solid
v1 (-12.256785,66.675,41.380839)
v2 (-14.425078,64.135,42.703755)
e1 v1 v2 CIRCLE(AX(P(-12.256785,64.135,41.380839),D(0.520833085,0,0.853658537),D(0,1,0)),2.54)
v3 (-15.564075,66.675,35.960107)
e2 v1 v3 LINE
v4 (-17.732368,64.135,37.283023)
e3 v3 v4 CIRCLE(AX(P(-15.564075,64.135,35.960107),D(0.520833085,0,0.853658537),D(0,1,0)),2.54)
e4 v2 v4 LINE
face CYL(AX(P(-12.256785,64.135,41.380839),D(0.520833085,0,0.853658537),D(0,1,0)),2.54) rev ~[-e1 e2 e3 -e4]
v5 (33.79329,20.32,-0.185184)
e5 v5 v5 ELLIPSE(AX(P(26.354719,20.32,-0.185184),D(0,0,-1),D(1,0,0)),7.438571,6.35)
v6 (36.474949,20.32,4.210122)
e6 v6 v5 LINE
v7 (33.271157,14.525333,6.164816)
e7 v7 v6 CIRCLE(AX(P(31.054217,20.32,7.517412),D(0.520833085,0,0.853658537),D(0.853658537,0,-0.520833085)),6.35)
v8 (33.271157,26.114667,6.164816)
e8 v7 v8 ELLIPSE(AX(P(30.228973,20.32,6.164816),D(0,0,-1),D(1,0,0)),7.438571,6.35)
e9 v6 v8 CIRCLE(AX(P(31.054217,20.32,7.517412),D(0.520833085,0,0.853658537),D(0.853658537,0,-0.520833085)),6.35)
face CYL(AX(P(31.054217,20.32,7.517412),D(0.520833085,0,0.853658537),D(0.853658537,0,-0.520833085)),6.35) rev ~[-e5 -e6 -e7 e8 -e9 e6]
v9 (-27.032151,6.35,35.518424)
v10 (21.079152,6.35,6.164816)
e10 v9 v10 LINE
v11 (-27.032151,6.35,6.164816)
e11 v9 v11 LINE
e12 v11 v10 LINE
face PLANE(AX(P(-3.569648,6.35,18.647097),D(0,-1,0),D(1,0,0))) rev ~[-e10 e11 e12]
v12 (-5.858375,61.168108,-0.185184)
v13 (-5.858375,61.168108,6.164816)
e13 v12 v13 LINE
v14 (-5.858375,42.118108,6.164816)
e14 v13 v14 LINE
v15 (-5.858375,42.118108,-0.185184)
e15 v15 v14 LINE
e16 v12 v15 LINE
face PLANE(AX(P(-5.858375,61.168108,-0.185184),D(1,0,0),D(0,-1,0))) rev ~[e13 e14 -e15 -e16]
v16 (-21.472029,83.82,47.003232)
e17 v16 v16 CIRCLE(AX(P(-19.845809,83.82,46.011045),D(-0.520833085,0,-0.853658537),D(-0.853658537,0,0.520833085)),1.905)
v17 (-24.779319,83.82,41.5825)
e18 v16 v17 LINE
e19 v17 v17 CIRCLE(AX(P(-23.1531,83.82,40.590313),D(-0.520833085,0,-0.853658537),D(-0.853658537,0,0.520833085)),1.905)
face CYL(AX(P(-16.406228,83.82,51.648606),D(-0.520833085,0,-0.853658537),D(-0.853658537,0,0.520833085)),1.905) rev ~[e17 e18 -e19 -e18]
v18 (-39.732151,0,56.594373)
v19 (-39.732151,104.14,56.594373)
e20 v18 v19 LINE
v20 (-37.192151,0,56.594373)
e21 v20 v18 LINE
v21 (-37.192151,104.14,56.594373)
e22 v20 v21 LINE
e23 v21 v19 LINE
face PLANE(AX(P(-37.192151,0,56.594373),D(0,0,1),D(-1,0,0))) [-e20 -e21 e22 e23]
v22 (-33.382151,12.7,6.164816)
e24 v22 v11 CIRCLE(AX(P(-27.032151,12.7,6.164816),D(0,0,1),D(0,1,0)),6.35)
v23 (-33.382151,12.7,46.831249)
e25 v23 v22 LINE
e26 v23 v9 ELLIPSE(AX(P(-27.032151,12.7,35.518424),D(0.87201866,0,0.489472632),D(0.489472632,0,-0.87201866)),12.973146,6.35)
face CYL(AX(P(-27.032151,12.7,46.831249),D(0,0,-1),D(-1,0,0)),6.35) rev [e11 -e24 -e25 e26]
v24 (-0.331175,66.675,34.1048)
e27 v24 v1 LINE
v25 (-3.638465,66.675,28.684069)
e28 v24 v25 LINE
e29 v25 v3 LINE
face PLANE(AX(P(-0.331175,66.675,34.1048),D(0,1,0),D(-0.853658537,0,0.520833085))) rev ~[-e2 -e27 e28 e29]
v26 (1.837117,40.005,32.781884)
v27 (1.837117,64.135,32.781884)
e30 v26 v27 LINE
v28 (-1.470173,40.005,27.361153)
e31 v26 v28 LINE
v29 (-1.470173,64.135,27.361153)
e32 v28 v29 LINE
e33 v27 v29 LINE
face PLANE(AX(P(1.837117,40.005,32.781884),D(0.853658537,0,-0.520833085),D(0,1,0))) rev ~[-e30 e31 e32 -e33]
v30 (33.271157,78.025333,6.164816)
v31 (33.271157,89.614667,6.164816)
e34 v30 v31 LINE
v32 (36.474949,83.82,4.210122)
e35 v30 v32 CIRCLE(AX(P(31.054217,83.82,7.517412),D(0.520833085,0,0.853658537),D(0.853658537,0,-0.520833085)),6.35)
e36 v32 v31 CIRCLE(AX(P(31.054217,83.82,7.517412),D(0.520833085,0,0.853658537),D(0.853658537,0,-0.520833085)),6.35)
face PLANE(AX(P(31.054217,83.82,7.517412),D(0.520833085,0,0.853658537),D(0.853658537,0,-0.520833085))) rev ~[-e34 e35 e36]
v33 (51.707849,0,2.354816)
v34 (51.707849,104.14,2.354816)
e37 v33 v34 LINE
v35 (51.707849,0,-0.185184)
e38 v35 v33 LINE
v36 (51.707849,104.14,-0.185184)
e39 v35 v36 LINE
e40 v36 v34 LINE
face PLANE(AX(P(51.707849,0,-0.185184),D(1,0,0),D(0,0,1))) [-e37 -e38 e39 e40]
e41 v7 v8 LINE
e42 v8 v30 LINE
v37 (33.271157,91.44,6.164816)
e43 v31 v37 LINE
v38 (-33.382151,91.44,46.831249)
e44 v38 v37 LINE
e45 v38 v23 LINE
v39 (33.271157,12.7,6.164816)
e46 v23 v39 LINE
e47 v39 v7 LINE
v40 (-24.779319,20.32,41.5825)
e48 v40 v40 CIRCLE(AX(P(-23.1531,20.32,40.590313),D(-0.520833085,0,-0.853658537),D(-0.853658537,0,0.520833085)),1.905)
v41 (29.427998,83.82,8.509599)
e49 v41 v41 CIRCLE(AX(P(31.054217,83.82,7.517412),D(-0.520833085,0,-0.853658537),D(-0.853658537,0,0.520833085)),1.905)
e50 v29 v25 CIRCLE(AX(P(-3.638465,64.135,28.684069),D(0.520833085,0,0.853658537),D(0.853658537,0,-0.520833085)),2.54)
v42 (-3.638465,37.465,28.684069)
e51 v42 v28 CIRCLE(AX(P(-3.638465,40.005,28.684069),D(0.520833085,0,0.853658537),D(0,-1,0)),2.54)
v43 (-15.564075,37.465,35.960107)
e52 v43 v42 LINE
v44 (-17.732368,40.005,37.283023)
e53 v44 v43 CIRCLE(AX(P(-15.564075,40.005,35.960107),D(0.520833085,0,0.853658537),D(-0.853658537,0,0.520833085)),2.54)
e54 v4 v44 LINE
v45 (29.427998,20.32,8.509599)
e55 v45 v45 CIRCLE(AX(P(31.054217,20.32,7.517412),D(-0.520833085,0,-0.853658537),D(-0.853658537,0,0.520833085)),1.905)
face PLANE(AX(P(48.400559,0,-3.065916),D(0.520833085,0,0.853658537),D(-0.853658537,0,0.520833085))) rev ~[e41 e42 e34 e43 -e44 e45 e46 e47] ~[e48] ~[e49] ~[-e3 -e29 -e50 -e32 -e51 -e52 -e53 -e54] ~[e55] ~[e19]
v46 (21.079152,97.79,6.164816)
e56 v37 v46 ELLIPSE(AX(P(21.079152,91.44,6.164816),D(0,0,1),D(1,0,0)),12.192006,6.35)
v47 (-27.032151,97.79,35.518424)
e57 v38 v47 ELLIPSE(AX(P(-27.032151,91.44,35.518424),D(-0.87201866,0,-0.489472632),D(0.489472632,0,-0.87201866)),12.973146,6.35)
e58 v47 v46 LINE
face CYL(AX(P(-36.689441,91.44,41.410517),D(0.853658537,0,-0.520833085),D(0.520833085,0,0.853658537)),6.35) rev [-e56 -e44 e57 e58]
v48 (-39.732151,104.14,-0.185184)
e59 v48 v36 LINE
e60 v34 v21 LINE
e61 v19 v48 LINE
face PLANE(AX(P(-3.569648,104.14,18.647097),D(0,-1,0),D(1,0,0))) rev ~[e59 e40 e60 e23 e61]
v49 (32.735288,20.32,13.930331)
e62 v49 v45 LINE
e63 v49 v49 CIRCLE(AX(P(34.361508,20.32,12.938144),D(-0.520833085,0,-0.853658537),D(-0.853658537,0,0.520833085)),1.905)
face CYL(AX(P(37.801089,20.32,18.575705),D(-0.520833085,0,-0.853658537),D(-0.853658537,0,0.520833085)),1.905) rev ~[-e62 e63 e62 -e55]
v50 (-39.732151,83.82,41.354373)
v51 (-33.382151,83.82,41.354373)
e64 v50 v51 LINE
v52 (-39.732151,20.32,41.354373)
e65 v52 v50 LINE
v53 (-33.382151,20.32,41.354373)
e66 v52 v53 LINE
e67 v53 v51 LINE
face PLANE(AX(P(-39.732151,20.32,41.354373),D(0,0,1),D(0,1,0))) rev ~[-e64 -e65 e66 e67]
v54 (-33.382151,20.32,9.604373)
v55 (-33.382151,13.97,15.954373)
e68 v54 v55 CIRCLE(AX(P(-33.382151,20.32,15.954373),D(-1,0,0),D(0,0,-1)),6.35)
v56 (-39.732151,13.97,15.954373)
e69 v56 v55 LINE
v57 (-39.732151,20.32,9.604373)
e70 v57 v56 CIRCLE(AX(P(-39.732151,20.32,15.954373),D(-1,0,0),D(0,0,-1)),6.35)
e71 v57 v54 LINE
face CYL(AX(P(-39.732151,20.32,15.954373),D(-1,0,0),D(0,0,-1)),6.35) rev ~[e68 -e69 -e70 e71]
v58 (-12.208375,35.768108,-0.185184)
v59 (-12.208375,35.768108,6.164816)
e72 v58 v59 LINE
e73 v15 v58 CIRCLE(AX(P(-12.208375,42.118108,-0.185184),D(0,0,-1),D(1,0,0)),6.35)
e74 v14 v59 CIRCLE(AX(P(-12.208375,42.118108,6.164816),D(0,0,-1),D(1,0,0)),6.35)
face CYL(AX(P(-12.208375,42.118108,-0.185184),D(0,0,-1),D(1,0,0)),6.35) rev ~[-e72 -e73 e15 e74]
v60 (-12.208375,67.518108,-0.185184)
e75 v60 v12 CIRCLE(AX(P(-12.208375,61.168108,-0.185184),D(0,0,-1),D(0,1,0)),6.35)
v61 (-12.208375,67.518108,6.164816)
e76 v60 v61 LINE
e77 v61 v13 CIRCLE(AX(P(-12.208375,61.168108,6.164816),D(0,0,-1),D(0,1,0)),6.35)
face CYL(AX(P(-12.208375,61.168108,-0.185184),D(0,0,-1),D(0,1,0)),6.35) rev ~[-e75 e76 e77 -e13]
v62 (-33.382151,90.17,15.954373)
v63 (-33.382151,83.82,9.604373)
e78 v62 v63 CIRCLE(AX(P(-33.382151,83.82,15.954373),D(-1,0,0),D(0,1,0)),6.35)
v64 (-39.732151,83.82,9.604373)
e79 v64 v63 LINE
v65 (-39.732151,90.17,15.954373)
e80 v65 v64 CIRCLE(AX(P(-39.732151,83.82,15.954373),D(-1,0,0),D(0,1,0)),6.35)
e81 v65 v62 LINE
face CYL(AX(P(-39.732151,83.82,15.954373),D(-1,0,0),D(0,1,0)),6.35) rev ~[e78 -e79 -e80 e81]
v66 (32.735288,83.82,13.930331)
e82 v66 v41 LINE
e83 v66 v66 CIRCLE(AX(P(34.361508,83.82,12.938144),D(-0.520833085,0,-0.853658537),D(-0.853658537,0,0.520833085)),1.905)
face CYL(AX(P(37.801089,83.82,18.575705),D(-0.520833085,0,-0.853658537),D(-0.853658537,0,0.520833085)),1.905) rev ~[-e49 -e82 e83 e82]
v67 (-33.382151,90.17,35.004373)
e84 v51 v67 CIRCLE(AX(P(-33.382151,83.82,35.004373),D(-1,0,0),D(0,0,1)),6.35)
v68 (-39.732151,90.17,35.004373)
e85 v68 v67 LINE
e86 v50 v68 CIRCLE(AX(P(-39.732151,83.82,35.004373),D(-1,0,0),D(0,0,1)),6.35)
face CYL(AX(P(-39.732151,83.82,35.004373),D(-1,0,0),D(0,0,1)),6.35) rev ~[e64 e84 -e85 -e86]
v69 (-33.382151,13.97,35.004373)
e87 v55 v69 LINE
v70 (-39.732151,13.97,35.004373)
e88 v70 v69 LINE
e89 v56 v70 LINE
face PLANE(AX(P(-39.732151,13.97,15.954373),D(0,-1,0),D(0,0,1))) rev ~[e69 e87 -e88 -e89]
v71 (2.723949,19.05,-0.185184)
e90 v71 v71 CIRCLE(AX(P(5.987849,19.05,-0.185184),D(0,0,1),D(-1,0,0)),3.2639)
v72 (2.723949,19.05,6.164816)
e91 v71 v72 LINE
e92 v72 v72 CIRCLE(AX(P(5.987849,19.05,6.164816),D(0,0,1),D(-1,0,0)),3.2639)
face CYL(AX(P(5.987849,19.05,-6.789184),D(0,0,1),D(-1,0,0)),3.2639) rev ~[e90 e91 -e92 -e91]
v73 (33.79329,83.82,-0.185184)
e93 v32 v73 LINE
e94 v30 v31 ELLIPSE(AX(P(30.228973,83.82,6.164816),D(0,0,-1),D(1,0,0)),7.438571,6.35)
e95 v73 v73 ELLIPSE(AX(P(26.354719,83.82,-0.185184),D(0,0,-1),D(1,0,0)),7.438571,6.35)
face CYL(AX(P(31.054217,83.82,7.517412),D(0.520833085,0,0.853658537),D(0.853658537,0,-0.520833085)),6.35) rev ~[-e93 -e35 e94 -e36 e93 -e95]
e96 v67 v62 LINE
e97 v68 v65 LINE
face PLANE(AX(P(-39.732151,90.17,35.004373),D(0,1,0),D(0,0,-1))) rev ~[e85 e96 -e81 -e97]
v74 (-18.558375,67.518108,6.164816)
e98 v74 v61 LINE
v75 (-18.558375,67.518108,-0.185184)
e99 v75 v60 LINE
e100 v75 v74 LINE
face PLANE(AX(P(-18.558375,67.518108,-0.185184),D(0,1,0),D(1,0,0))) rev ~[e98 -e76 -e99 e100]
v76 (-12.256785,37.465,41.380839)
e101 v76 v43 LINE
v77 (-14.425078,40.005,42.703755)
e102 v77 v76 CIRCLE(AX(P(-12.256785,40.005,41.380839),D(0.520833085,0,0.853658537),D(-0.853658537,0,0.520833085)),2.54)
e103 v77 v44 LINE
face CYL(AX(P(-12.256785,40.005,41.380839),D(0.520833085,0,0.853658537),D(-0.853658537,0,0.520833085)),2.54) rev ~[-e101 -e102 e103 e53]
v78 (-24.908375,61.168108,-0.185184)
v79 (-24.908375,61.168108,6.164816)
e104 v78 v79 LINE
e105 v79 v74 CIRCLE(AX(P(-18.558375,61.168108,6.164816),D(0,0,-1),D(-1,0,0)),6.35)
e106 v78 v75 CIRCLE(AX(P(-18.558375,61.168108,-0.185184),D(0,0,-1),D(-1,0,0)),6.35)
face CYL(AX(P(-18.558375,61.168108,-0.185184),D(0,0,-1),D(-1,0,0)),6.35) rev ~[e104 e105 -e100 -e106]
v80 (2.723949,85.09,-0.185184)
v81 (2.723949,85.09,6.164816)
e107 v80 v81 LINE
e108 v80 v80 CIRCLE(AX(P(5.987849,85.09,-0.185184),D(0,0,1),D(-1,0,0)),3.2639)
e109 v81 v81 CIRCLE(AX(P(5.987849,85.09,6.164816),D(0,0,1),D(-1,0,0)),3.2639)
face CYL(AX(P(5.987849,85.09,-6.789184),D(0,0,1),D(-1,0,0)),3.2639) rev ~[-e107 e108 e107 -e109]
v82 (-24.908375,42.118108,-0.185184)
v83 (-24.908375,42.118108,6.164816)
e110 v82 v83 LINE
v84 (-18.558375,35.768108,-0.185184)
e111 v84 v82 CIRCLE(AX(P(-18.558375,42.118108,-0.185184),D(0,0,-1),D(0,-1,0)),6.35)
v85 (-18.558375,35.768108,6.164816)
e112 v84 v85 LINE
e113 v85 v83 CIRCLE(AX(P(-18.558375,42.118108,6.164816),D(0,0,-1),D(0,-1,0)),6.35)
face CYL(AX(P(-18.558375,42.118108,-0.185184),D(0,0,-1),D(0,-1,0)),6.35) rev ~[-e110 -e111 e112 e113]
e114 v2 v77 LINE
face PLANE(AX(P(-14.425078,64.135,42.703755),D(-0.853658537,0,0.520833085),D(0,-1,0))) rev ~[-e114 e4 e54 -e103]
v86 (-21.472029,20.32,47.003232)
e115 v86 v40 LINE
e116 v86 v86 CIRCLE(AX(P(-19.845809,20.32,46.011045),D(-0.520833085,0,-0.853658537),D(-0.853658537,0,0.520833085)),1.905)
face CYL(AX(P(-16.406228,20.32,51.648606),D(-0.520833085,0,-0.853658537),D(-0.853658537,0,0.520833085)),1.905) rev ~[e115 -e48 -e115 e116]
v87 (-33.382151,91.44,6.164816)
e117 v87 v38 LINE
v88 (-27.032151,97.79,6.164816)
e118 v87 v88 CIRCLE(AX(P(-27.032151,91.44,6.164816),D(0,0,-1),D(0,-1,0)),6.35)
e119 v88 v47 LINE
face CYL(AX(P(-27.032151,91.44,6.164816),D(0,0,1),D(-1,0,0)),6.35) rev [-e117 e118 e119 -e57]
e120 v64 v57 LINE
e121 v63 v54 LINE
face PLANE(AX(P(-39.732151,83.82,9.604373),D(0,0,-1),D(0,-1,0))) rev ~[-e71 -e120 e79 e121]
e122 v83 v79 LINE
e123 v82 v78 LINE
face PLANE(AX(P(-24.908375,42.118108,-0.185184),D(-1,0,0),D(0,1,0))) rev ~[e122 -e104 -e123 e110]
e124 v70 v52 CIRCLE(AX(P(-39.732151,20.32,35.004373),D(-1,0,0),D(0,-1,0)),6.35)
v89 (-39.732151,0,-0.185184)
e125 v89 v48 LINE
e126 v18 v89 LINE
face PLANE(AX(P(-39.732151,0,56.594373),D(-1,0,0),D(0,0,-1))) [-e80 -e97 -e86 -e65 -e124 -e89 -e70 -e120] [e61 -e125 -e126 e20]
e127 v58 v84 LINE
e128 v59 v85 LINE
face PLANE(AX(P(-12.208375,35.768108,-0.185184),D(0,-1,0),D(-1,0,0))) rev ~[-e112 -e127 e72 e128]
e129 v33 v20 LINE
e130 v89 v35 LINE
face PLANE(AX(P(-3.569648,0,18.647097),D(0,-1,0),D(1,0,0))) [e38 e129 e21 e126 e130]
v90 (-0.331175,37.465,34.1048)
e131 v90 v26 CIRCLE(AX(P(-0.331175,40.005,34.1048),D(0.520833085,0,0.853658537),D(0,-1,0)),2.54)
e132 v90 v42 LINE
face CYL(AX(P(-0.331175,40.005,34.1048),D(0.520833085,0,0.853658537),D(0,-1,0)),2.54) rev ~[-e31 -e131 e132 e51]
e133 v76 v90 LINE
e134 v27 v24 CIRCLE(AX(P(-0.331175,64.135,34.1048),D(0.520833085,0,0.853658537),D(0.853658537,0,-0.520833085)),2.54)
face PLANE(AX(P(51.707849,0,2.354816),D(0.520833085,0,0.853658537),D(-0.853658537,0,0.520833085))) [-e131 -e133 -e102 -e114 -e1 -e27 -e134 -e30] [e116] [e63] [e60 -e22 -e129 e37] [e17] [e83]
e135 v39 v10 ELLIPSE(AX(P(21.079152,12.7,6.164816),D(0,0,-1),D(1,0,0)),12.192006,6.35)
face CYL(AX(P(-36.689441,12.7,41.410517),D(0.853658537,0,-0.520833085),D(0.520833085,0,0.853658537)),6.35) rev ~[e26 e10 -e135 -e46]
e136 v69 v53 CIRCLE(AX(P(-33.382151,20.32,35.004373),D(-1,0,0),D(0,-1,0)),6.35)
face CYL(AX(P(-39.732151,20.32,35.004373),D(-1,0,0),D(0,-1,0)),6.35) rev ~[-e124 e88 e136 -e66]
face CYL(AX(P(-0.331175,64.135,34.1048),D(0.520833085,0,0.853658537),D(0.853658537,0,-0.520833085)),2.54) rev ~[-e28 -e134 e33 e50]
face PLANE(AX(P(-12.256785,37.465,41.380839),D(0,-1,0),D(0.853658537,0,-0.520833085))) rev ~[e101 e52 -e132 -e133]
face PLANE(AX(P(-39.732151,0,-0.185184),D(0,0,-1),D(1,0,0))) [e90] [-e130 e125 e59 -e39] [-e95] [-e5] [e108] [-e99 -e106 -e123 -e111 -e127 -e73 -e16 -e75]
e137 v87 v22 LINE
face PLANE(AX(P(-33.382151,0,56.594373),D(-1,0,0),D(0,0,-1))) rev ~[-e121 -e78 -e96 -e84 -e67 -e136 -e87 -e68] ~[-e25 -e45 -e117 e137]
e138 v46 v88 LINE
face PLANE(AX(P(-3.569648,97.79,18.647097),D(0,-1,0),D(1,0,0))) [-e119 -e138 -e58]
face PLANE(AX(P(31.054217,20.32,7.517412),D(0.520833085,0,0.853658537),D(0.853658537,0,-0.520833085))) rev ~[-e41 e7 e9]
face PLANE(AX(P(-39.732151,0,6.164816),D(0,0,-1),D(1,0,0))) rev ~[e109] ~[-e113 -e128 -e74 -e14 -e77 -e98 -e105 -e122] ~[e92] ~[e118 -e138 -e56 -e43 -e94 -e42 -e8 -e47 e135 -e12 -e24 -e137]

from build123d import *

# Parameters (mm, degrees)
F1_DEPTH  = 104.14
F2_T      = -6.35
F4_D      = 3.81
F4_DEPTH  = 6.604
F4_TIP    = 1.1446394792
F6_DEPTH  = 12.7
F8_DEPTH  = 12.7
F9_R      = 6.35
F10_START = -6.35
F3_R      = 6.35
F10_DEPTH = 19.05
F12_DEPTH = 6.35
F13_D     = 6.5278
F13_DEPTH = 6.604
F13_TIP   = 1.9611489744


with BuildPart() as f1:
    # F0 (on Front) → F1 (new body)
    with BuildSketch(Plane.XZ):
        Polygon((-37.1921509504, 56.5943730235), (-39.7321509504, 56.5943730235), (-39.7321509504, -0.1851844968), (51.7078490496, -0.1851844968), (51.7078490496, 2.3548155032), align=None)
    extrude(amount=-F1_DEPTH)

    # F2 (hollow: no face is removed)
    offset(amount=F2_T, mode=Mode.SUBTRACT)

    # F4
    with Locations(Plane(origin=(15.0736214303, 0, 24.7060449314), x_dir=(0.8536585366, 0, -0.5208330855), z_dir=(0.5208330855, 0, 0.8536585366))):
        with Locations((-40.9056190746, 20.32), (-40.9056190746, 83.82), (22.5943809254, 83.82), (22.5943809254, 20.32)):
            Hole(F4_D / 2, depth=F4_DEPTH)
            with Locations((0, 0, -(F4_DEPTH + F4_TIP / 2))):  # 118° drill point
                Cone(0, F4_D / 2, F4_TIP, mode=Mode.SUBTRACT)

    # F5 (on face) → F6 (cut)
    with BuildSketch(Plane(origin=(15.0736214303, 0, 24.7060449314), x_dir=(0.8536585366, 0, -0.5208330855), z_dir=(0.5208330855, 0, 0.8536585366))):
        with BuildLine():
            ThreePointArc((-34.5556190746, 40.005), (-33.8116702988, 38.2089487758), (-32.0156190746, 37.465))
            Line((-32.0156190746, 37.465), (-18.0456190746, 37.465))
            ThreePointArc((-18.0456190746, 37.465), (-16.2495678504, 38.2089487758), (-15.5056190746, 40.005))
            Line((-15.5056190746, 40.005), (-15.5056190746, 64.135))
            ThreePointArc((-15.5056190746, 64.135), (-16.2495678504, 65.9310512242), (-18.0456190746, 66.675))
            Line((-18.0456190746, 66.675), (-32.0156190746, 66.675))
            ThreePointArc((-32.0156190746, 66.675), (-33.8116702988, 65.9310512242), (-34.5556190746, 64.135))
            Line((-34.5556190746, 64.135), (-34.5556190746, 40.005))
        make_face()
    extrude(amount=-F6_DEPTH, mode=Mode.SUBTRACT)

    # F7 (on face) → F8 (cut)
    with BuildSketch(Plane(origin=(-39.7321509504, 0, 0), x_dir=(0, -1, 0), z_dir=(-1, 0, 0))):
        with BuildLine():
            Line((-20.32, 41.3543730235), (-83.82, 41.3543730235))
            ThreePointArc((-83.82, 41.3543730235), (-88.3101280605, 39.494501084), (-90.17, 35.0043730235))
            Line((-90.17, 35.0043730235), (-90.17, 15.9543730235))
            ThreePointArc((-90.17, 15.9543730235), (-88.3101280605, 11.464244963), (-83.82, 9.6043730235))
            Line((-83.82, 9.6043730235), (-20.32, 9.6043730235))
            ThreePointArc((-20.32, 9.6043730235), (-15.8298719395, 11.464244963), (-13.97, 15.9543730235))
            Line((-13.97, 15.9543730235), (-13.97, 35.0043730235))
            ThreePointArc((-13.97, 35.0043730235), (-15.8298719395, 39.494501084), (-20.32, 41.3543730235))
        make_face()
    extrude(amount=-F8_DEPTH, mode=Mode.SUBTRACT)

    # F9
    f9_edges = [f1.edges().sort_by_distance(p)[0] for p in [
        (-0.055497, 6.35, 26.498032),
        (-0.055497, 97.79, 26.498032),
        (-33.382151, 6.35, 26.498032),
        (-33.382151, 97.79, 26.498032),
    ]]
    fillet(f9_edges, radius=F9_R)

    # F3 (on face) → F10 (cut)
    with BuildSketch(Plane(origin=(15.0736214303, 0, 24.7060449314), x_dir=(0.8536585366, 0, -0.5208330855), z_dir=(0.5208330855, 0, 0.8536585366)).offset(F10_START)):
        with Locations((22.5943809254, 83.82)):
            Circle(F3_R)
        with Locations((22.5943809254, 20.32)):
            Circle(F3_R)
    extrude(amount=-F10_DEPTH, mode=Mode.SUBTRACT)

    # F11 (on face) → F12 (cut)
    with BuildSketch(Plane(origin=(0, 0, -0.1851844968), x_dir=(1, 0, 0), z_dir=(0, 0, -1))):
        with BuildLine():
            ThreePointArc((-5.858374995, -42.1181075931), (-7.7182469345, -37.6279795325), (-12.208374995, -35.7681075931))
            Line((-12.208374995, -35.7681075931), (-18.558374995, -35.7681075931))
            ThreePointArc((-18.558374995, -35.7681075931), (-23.0485030555, -37.6279795325), (-24.908374995, -42.1181075931))
            Line((-24.908374995, -42.1181075931), (-24.908374995, -61.1681075931))
            ThreePointArc((-24.908374995, -61.1681075931), (-23.0485030555, -65.6582356536), (-18.558374995, -67.5181075931))
            Line((-18.558374995, -67.5181075931), (-12.208374995, -67.5181075931))
            ThreePointArc((-12.208374995, -67.5181075931), (-7.7182469345, -65.6582356536), (-5.858374995, -61.1681075931))
            Line((-5.858374995, -61.1681075931), (-5.858374995, -42.1181075931))
        make_face()
    extrude(amount=-F12_DEPTH, mode=Mode.SUBTRACT)

    # F13
    with Locations(Plane(origin=(0, 0, -0.1851844968), x_dir=(1, 0, 0), z_dir=(0, 0, -1))):
        with Locations((5.9878490496, -19.05), (5.9878490496, -85.09)):
            Hole(F13_D / 2, depth=F13_DEPTH)
            with Locations((0, 0, -(F13_DEPTH + F13_TIP / 2))):  # 118° drill point
                Cone(0, F13_D / 2, F13_TIP, mode=Mode.SUBTRACT)


solid = f1.part
